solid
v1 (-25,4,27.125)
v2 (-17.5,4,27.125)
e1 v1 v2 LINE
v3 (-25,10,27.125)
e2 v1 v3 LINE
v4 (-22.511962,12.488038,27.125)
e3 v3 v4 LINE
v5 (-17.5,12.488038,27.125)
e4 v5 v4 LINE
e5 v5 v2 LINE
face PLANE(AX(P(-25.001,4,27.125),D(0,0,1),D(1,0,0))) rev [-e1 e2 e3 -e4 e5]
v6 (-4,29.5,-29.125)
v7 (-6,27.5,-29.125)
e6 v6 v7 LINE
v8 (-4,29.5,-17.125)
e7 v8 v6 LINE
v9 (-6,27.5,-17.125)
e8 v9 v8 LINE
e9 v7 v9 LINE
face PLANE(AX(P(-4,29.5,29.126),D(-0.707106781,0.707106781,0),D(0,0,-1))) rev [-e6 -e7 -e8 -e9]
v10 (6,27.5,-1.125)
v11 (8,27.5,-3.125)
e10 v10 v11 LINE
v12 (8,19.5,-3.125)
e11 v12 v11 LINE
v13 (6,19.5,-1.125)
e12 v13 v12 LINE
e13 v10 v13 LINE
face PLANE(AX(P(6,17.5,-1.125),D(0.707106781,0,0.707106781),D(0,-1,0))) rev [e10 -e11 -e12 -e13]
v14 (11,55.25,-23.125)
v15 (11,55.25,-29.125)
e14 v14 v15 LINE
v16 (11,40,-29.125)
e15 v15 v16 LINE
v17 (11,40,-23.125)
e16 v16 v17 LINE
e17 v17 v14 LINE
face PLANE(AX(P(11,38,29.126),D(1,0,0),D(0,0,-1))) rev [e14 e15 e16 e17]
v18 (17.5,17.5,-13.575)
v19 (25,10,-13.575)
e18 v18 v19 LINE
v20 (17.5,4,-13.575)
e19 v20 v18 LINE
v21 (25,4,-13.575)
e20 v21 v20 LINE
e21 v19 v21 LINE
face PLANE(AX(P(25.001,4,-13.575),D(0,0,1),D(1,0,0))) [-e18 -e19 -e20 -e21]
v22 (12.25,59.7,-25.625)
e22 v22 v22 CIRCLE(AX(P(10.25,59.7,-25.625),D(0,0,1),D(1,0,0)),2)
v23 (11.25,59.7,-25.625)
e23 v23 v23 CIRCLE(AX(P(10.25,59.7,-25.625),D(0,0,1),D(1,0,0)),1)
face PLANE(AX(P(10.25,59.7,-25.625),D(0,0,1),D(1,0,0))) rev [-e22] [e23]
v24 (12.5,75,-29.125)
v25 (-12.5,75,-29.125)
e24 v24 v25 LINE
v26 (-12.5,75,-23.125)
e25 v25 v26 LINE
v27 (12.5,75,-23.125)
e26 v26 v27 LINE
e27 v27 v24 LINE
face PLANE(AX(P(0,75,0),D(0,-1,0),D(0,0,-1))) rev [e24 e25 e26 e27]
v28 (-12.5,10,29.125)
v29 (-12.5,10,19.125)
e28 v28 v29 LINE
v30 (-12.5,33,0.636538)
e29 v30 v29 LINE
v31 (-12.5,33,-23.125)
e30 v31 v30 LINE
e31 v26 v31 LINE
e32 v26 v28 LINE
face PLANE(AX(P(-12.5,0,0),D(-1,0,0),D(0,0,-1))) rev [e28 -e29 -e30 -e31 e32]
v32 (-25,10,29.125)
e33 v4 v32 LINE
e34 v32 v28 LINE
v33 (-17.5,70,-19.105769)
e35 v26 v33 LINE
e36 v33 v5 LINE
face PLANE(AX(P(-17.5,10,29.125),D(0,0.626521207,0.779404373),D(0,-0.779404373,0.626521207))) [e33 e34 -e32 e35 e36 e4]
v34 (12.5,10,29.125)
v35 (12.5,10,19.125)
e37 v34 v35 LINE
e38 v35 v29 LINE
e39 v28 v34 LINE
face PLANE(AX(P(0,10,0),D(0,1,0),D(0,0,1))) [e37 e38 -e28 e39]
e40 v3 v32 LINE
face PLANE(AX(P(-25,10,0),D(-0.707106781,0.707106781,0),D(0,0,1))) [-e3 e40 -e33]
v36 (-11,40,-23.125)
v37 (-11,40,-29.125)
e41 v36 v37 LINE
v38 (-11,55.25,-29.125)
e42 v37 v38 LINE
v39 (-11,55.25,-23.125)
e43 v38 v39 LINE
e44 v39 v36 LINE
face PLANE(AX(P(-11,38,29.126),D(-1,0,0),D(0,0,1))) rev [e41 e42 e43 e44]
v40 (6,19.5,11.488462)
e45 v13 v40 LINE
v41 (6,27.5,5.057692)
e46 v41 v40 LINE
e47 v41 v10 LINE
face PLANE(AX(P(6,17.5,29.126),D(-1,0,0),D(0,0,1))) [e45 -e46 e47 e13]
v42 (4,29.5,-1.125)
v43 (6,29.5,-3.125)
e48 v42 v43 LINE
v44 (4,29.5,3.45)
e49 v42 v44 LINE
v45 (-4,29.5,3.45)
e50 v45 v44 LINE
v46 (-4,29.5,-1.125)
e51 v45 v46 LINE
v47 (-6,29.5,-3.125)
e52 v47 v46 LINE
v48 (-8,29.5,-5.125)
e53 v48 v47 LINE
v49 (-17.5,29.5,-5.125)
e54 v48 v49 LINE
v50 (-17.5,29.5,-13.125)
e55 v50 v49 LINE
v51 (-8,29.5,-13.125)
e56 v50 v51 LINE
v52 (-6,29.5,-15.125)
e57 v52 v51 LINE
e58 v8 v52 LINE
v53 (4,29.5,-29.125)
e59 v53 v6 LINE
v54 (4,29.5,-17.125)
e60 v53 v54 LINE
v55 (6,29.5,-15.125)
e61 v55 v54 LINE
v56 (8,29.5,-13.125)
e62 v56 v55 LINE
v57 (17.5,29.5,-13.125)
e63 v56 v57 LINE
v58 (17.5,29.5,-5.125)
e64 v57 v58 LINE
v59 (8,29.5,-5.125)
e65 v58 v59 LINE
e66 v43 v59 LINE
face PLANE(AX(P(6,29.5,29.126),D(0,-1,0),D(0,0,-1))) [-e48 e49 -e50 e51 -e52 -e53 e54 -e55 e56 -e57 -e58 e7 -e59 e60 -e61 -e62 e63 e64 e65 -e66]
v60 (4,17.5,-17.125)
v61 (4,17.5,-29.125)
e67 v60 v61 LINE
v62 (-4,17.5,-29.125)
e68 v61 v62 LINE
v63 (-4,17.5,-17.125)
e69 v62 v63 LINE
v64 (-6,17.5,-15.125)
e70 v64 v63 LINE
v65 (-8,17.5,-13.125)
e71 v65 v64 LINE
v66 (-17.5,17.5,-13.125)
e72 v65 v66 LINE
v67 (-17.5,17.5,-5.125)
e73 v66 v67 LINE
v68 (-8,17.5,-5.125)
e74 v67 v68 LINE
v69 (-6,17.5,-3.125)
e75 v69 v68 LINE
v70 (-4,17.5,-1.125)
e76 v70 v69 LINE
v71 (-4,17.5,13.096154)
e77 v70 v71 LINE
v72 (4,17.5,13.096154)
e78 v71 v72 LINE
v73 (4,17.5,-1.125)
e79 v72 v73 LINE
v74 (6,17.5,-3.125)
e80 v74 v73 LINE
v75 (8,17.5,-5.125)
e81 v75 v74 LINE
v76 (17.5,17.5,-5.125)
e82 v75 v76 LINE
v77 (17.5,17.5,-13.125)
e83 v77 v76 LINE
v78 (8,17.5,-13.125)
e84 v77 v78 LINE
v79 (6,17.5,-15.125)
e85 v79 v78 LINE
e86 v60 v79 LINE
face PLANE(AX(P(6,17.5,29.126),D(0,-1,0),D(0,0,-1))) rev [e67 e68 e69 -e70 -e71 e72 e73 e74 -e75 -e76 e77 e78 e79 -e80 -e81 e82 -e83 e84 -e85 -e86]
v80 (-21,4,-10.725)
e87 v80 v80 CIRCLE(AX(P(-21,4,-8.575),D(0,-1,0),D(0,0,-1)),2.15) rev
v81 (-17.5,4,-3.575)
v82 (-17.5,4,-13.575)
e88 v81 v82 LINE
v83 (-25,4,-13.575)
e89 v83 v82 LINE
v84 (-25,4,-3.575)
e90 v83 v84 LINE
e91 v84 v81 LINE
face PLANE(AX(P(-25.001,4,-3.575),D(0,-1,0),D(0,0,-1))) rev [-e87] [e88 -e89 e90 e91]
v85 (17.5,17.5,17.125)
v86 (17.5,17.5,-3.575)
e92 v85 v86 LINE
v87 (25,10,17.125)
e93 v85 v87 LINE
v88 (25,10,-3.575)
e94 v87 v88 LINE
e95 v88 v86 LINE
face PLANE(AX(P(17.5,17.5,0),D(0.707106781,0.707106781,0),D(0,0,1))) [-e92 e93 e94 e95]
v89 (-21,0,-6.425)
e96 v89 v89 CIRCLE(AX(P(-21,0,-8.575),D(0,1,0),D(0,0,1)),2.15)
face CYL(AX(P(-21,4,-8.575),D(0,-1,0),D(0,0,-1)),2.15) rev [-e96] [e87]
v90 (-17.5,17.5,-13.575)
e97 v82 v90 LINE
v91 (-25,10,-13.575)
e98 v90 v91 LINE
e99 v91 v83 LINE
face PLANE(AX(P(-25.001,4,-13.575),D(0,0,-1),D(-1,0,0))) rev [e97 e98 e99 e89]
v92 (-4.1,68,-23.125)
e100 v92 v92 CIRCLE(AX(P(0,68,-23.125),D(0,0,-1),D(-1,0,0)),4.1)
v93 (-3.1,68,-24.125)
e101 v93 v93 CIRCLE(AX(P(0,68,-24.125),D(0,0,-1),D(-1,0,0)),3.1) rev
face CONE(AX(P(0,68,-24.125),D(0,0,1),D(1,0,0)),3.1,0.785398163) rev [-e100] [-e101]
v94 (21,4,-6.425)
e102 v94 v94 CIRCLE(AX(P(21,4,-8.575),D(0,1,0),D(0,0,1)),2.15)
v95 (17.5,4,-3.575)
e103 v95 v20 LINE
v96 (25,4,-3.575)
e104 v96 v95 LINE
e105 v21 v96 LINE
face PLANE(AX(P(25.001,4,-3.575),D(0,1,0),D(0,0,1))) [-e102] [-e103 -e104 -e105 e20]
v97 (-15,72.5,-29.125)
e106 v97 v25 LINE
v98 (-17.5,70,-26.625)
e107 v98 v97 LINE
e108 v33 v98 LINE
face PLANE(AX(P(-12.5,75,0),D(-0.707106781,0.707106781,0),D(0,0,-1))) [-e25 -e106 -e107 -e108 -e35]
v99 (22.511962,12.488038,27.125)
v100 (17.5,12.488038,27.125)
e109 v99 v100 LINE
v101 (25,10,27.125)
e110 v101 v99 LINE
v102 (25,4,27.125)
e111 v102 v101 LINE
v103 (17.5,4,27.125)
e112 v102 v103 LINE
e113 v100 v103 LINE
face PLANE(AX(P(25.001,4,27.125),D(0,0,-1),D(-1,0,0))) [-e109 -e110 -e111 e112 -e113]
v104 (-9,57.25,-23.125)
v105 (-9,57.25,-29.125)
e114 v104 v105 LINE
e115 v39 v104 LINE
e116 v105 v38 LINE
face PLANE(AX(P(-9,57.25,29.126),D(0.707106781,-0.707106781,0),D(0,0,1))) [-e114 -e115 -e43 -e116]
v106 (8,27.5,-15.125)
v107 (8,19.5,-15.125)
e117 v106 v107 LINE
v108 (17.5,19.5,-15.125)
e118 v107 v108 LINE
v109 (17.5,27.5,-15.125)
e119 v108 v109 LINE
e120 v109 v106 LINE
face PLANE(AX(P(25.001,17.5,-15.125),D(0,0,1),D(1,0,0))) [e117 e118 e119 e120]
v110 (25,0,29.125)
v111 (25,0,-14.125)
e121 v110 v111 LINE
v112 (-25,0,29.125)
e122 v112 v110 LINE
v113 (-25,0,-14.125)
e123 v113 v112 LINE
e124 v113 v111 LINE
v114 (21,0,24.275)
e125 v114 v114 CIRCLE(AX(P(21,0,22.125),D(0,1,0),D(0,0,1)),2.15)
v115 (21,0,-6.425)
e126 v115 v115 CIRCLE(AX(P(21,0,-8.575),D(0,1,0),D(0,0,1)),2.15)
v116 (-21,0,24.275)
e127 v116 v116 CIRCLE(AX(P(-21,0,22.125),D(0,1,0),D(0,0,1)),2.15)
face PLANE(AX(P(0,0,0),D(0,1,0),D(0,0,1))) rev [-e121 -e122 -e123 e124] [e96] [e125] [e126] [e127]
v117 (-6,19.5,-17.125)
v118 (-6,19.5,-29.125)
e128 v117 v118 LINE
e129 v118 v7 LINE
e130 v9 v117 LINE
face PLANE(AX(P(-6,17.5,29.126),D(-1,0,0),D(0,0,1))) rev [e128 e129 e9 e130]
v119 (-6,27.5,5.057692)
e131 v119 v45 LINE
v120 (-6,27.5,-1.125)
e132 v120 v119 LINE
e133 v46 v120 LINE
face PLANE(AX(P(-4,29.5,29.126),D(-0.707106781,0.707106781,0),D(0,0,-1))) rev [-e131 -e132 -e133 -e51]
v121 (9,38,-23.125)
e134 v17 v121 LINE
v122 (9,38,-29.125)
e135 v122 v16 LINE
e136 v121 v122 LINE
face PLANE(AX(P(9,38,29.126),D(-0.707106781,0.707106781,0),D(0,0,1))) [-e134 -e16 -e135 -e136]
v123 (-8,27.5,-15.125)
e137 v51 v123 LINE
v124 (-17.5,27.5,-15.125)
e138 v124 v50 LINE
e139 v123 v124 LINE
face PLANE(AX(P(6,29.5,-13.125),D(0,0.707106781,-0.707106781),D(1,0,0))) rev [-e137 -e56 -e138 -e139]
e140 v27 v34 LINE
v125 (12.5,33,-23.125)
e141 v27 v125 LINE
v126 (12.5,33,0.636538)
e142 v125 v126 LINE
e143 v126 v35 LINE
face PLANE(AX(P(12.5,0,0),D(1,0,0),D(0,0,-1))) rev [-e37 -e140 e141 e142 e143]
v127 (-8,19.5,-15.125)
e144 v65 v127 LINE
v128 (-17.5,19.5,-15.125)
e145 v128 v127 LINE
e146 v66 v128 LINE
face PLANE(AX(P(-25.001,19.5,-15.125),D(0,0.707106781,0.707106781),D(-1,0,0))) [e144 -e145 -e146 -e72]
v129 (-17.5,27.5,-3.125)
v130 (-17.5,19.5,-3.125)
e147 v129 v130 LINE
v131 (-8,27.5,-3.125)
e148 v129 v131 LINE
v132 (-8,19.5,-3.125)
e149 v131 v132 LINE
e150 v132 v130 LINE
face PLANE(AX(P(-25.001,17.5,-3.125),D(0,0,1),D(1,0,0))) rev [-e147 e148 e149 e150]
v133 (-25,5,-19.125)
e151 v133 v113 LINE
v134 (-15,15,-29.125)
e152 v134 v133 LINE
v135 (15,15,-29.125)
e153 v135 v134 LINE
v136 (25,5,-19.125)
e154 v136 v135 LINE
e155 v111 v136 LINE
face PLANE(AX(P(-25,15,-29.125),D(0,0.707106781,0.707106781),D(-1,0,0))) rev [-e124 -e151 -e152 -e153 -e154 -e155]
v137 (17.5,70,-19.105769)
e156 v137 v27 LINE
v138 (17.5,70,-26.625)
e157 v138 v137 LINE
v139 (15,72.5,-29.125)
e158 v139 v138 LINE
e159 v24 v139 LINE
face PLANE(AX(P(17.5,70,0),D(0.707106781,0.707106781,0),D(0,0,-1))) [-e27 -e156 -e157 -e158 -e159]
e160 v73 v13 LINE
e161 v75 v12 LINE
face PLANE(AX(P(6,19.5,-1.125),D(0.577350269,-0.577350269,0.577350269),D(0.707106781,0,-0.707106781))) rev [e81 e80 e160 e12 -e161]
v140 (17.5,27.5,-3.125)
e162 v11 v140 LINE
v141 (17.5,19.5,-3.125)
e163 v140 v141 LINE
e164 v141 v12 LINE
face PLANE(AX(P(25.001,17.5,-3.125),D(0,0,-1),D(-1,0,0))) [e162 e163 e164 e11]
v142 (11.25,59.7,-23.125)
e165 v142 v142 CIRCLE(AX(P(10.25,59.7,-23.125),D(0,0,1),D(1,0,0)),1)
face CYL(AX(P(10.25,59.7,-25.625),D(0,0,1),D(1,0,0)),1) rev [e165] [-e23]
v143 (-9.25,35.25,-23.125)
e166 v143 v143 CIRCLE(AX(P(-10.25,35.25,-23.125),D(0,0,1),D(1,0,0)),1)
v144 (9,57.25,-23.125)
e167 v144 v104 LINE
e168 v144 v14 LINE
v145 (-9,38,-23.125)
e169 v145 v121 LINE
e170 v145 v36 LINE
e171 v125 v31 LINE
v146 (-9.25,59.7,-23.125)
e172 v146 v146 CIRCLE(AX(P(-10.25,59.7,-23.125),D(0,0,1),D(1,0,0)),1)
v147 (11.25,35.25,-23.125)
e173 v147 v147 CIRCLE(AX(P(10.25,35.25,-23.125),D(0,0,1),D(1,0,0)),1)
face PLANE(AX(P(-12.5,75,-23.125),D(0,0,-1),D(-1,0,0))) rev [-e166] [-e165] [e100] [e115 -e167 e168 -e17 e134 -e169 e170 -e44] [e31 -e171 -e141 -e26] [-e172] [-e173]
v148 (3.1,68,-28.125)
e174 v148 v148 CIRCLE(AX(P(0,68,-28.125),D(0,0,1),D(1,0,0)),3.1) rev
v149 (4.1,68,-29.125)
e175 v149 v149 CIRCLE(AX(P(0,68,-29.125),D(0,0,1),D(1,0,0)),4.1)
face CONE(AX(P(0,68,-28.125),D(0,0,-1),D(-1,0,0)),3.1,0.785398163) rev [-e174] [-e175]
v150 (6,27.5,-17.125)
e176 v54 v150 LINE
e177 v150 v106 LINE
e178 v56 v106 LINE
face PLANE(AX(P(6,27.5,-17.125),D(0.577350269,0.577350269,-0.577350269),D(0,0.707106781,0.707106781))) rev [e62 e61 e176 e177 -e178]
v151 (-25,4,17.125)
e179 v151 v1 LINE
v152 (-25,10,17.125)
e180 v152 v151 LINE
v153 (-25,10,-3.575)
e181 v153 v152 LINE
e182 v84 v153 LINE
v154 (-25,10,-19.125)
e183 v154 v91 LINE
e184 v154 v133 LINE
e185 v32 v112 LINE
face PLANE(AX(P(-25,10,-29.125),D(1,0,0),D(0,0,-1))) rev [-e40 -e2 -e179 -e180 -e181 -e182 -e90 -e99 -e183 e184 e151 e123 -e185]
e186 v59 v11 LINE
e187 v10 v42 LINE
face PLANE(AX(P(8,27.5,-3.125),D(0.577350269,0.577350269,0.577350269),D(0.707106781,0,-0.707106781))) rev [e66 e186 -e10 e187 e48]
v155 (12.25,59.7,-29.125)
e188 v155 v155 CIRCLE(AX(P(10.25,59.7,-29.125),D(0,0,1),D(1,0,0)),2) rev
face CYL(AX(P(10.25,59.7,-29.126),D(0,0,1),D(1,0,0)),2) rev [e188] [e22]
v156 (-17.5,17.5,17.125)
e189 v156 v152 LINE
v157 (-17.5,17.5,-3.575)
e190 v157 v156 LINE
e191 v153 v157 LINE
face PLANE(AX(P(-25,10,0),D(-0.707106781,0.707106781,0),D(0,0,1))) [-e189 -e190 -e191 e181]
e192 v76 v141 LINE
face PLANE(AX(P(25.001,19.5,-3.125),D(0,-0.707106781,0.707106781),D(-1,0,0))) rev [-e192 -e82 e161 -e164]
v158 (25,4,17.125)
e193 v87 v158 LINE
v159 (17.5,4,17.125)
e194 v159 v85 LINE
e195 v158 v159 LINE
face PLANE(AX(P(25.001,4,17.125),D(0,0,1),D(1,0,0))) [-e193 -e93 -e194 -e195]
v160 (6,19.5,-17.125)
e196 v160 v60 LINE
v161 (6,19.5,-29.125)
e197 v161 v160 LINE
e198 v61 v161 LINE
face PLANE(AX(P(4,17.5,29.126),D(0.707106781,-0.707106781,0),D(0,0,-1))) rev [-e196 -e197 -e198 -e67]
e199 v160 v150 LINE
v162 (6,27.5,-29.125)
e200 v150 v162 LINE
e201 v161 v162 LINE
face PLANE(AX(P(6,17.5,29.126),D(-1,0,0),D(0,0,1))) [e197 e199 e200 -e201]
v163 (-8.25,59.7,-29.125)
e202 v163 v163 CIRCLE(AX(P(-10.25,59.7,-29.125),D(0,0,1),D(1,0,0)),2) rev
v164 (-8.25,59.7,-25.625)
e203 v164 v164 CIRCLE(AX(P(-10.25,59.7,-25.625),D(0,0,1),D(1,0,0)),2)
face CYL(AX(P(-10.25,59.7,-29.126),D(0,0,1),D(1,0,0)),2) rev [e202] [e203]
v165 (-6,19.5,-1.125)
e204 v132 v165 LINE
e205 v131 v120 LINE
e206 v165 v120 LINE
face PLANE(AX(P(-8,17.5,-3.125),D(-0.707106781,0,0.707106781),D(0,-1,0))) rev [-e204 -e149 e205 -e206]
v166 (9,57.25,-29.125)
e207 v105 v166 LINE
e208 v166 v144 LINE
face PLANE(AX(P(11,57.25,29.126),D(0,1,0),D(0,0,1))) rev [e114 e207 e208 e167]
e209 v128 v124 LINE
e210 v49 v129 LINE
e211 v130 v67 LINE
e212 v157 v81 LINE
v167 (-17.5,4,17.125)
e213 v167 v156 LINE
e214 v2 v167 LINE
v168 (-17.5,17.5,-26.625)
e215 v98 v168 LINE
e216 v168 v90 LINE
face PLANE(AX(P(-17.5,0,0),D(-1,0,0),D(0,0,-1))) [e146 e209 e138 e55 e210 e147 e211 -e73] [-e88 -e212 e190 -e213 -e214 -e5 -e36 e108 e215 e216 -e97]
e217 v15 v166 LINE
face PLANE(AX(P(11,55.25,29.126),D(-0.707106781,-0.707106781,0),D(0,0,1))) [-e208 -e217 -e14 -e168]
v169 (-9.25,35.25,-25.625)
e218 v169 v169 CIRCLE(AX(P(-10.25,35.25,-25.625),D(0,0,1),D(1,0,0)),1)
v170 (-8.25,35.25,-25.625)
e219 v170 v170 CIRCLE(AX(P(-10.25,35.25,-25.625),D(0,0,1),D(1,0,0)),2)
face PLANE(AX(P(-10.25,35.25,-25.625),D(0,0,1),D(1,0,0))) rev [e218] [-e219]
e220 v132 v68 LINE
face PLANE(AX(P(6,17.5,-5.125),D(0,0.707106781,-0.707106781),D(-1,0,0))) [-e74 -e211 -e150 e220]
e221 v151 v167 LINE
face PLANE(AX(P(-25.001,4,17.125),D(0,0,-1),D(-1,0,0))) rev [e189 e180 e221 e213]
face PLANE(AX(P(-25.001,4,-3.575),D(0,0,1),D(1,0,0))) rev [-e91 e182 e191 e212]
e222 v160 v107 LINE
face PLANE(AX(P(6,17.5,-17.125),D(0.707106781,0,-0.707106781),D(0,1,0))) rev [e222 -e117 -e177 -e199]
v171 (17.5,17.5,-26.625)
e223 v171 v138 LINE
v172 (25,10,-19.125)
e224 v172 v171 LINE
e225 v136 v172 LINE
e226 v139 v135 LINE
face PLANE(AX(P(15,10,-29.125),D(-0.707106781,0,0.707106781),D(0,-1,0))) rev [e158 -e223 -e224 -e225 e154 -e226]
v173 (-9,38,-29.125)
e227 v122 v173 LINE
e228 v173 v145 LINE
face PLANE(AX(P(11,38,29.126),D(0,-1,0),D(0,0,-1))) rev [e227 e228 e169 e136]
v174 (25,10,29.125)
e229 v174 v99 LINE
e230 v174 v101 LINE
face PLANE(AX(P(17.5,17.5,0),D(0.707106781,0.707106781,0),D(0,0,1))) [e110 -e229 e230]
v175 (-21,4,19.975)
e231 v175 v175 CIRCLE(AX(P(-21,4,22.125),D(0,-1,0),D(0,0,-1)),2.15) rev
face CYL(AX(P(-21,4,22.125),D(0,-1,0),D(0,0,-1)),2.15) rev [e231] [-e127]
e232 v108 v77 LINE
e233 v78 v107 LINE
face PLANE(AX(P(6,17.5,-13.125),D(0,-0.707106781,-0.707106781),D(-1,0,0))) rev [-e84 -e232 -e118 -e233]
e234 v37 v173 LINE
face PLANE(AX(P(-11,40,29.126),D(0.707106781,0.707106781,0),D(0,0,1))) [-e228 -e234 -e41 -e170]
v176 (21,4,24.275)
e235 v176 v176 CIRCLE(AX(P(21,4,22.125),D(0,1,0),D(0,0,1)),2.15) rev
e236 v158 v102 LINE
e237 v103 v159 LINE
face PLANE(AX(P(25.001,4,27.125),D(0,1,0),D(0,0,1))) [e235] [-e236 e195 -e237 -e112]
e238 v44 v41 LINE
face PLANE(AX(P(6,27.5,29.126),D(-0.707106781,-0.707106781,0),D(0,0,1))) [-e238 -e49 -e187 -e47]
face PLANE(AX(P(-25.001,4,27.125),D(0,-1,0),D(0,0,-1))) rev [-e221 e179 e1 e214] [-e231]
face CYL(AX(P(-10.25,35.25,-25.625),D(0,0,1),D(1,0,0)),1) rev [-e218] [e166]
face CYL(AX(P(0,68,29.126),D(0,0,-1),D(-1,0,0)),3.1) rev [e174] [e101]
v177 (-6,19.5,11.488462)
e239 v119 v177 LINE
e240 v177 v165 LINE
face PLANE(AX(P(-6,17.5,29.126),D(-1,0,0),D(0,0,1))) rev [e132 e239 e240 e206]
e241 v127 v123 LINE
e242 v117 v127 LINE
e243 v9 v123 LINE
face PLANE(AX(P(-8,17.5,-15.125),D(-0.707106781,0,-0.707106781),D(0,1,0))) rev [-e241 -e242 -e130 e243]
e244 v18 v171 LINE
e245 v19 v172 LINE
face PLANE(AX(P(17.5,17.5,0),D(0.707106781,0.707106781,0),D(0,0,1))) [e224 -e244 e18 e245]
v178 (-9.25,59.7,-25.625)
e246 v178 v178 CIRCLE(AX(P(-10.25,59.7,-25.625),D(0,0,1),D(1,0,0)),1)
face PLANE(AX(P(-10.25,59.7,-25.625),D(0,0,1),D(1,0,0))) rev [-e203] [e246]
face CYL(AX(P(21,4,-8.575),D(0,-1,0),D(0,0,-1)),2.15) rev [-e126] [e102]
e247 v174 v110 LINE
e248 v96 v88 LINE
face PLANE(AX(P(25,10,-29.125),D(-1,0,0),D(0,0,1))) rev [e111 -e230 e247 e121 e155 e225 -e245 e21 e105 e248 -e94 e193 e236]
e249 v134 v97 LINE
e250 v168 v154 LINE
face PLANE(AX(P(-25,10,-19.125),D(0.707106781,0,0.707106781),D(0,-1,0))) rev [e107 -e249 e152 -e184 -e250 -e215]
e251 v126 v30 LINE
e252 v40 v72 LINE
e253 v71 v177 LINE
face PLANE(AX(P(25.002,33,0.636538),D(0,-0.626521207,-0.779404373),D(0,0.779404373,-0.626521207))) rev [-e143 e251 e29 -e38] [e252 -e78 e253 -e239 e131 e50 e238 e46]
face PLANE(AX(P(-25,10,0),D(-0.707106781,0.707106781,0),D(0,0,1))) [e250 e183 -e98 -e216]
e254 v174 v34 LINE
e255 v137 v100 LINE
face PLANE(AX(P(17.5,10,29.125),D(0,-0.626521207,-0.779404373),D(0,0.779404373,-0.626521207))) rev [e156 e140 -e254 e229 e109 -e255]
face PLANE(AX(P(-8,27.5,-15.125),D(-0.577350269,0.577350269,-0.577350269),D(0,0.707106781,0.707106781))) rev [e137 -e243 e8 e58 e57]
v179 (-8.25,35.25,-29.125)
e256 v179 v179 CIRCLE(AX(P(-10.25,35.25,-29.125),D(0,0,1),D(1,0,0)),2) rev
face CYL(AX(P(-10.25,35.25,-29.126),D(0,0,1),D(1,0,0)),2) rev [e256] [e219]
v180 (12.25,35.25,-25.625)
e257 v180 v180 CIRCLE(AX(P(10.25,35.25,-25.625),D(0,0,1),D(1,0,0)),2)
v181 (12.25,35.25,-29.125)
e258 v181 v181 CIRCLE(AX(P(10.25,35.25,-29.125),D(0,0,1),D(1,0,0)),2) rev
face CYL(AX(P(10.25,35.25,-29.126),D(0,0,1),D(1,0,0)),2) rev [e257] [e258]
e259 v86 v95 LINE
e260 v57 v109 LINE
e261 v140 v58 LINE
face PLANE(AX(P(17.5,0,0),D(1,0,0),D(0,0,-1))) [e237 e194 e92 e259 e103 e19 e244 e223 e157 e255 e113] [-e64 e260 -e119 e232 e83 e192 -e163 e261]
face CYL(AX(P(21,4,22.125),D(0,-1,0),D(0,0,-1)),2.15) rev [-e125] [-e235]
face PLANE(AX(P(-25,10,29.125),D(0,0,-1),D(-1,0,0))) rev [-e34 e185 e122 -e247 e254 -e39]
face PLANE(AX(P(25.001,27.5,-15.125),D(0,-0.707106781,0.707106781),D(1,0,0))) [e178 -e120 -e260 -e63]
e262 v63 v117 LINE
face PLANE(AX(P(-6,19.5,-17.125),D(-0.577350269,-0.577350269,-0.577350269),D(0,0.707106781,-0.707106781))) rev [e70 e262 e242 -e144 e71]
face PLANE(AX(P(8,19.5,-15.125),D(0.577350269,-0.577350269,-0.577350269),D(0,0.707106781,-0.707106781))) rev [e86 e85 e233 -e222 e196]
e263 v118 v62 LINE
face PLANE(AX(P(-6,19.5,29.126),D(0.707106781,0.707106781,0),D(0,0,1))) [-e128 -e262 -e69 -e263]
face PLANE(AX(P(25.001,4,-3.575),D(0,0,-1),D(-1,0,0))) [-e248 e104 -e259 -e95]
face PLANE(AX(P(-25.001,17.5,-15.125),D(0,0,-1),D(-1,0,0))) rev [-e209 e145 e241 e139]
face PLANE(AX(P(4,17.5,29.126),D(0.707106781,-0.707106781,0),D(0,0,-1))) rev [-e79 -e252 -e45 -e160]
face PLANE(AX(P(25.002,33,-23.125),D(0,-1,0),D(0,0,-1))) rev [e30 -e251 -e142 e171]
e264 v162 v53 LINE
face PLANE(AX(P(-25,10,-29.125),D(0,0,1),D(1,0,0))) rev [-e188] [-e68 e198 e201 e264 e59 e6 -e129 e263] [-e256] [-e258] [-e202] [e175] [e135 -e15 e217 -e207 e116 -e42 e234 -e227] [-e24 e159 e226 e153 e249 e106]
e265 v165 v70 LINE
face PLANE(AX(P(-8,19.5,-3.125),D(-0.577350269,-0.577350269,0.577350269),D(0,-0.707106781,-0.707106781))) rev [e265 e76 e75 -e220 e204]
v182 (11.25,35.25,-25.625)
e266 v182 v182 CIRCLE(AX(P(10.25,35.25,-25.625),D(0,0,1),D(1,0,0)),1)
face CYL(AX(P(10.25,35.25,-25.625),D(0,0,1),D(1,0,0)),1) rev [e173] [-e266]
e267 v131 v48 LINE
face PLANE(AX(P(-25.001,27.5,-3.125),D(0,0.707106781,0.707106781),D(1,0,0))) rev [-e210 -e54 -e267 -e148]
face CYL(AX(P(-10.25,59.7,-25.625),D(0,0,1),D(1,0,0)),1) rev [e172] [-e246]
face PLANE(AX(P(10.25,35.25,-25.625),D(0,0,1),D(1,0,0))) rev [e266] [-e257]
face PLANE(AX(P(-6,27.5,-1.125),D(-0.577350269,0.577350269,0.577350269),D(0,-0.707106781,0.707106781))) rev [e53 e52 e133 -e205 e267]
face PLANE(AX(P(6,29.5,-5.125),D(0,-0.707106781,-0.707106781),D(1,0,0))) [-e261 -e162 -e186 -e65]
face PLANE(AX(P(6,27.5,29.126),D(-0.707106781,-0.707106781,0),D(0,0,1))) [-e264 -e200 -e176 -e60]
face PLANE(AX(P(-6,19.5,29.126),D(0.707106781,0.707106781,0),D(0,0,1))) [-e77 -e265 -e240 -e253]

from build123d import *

# Parameters (mm, degrees)
SKETCH1_W               = 50
SKETCH1_H               = 58.25
BOSS_EXTRUDE1_DEPTH     = 10
SKETCH2_R               = 2.15
CUT_EXTRUDE1_DEPTH      = 4
SKETCH5_W               = 25
SKETCH5_H               = 6
BOSS_EXTRUDE3_DEPTH     = 65
CUT_EXTRUDE3_REACH      = 100.199
SKETCH6_W               = 22
SKETCH6_H               = 19.25
SKETCH7_R               = 1
CUT_EXTRUDE4_DEPTH      = 2.5
CUT_EXTRUDE5_REACH      = 98.164
SKETCH8_R               = 2
BOSS_EXTRUDE4_DEPTH     = 5
CHAMFER1_SIZE           = 7.5
CHAMFER2_SIZE           = 10
CHAMFER4_SIZE           = 15
CHAMFER5_SIZE           = 5
CHAMFER7_SIZE           = 2
CUT_EXTRUDE6_REACH      = 100.199
SKETCH10_R              = 3.1
CHAMFER8_SIZE           = 1
BOSS_EXTRUDE5_REACH     = 90.767
CUT_EXTRUDE7_REACH      = 100.199
SKETCH12_W              = 12
SKETCH12_H              = 12
CUT_EXTRUDE9_REACH      = 88.222
SKETCH14_W              = 12
SKETCH14_H              = 12
CHAMFER11_SIZE          = 2
CUT_EXTRUDE12_OUTLINE_W = 10
CUT_EXTRUDE12_OUTLINE_H = 13.5
CUT_EXTRUDE12_DEPTH     = 7.5
LPATTERN1_COUNT         = 2
LPATTERN1_PITCH         = 30.7
MIRROR3_COPY_1_SKETCH_W = 10
MIRROR3_COPY_1_SKETCH_H = 13.5
MIRROR3_COPY_1_DEPTH    = 7.5


# Read off the part's stored shape, not the designer's step: Cut-Extrude12
with BuildPart() as part:
    # Sketch1 → Boss-Extrude1 (new body)
    with BuildSketch(Plane(origin=(0, 0, 0), x_dir=(1, 0, 0), z_dir=(0, 1, 0))):
        Rectangle(SKETCH1_W, SKETCH1_H)
    extrude(amount=BOSS_EXTRUDE1_DEPTH)

    # Sketch2 → Cut-Extrude1 (cut)
    with BuildSketch(Plane(origin=(0, 0, 0), x_dir=(1, 0, 0), z_dir=(0, 1, 0))):
        with Locations(Location((-21, 8.575, 0), (0, 0, 270))):
            Circle(SKETCH2_R)
        with Locations(Location((-21, -22.125, 0), (0, 0, 270))):
            Circle(SKETCH2_R)
        with Locations(Location((21, 8.575, 0), (0, 0, 270))):
            Circle(SKETCH2_R)
        with Locations(Location((21, -22.125, 0), (0, 0, 270))):
            Circle(SKETCH2_R)
    extrude(amount=CUT_EXTRUDE1_DEPTH, mode=Mode.SUBTRACT)

    # Sketch5 → Boss-Extrude3 (add)
    with BuildSketch(Plane(origin=(0, 10, 0), x_dir=(1, 0, 0), z_dir=(0, 1, 0))):
        with Locations((0, 26.125)):
            Rectangle(SKETCH5_W, SKETCH5_H)
    extrude(amount=BOSS_EXTRUDE3_DEPTH)

    # Sketch6 → Cut-Extrude3 (cut, up to next)
    with BuildSketch(Plane(origin=(0, 0, -29.125), x_dir=(-1, 0, 0), z_dir=(0, 0, -1)), mode=Mode.PRIVATE) as cut_extrude3_sk1:
        with Locations((0, 47.625)):
            Rectangle(SKETCH6_W, SKETCH6_H)
    cut_extrude3_tool1 = extrude(cut_extrude3_sk1.sketch, amount=-CUT_EXTRUDE3_REACH, mode=Mode.PRIVATE) & part.part
    add(cut_extrude3_tool1.solids().sort_by_distance((0, 47.625, -29.125))[0], mode=Mode.SUBTRACT)

    # Sketch7 → Cut-Extrude4 (cut)
    with BuildSketch(Plane.XY.offset(-23.125)):
        with Locations((10.25, 35.25)):
            Circle(SKETCH7_R)
        with Locations((-10.25, 35.25)):
            Circle(SKETCH7_R)
        with Locations((-10.25, 59.7)):
            Circle(SKETCH7_R)
        with Locations((10.25, 59.7)):
            Circle(SKETCH7_R)
    extrude(amount=-CUT_EXTRUDE4_DEPTH, mode=Mode.SUBTRACT)

    # Sketch8 → Cut-Extrude5 (cut, up to next)
    with BuildSketch(Plane.XY.offset(-25.625), mode=Mode.PRIVATE) as cut_extrude5_sk1:
        with Locations((-10.25, 59.7)):
            Circle(SKETCH8_R)
    cut_extrude5_tool1 = extrude(cut_extrude5_sk1.sketch, amount=-CUT_EXTRUDE5_REACH, mode=Mode.PRIVATE) & part.part
    # Sketch8 → Cut-Extrude5 (cut, up to next)
    with BuildSketch(Plane.XY.offset(-25.625), mode=Mode.PRIVATE) as cut_extrude5_sk2:
        with Locations((10.25, 59.7)):
            Circle(SKETCH8_R)
    cut_extrude5_tool2 = extrude(cut_extrude5_sk2.sketch, amount=-CUT_EXTRUDE5_REACH, mode=Mode.PRIVATE) & part.part
    # Sketch8 → Cut-Extrude5 (cut, up to next)
    with BuildSketch(Plane.XY.offset(-25.625), mode=Mode.PRIVATE) as cut_extrude5_sk3:
        with Locations((10.25, 35.25)):
            Circle(SKETCH8_R)
    cut_extrude5_tool3 = extrude(cut_extrude5_sk3.sketch, amount=-CUT_EXTRUDE5_REACH, mode=Mode.PRIVATE) & part.part
    # Sketch8 → Cut-Extrude5 (cut, up to next)
    with BuildSketch(Plane.XY.offset(-25.625), mode=Mode.PRIVATE) as cut_extrude5_sk4:
        with Locations((-10.25, 35.25)):
            Circle(SKETCH8_R)
    cut_extrude5_tool4 = extrude(cut_extrude5_sk4.sketch, amount=-CUT_EXTRUDE5_REACH, mode=Mode.PRIVATE) & part.part
    add(cut_extrude5_tool1.solids().sort_by_distance((-10.25, 59.7, -25.625))[0], mode=Mode.SUBTRACT)
    add(cut_extrude5_tool2.solids().sort_by_distance((10.25, 59.7, -25.625))[0], mode=Mode.SUBTRACT)
    add(cut_extrude5_tool3.solids().sort_by_distance((10.25, 35.25, -25.625))[0], mode=Mode.SUBTRACT)
    add(cut_extrude5_tool4.solids().sort_by_distance((-10.25, 35.25, -25.625))[0], mode=Mode.SUBTRACT)

    # Sketch9 → Boss-Extrude4 (add)
    with BuildSketch(Plane(origin=(12.5, 0, 0), x_dir=(0, 0, -1), z_dir=(1, 0, 0))):
        Polygon((29.125, 75), (23.125, 75), (-29.125, 10), (29.125, 10), align=None)
    boss_extrude4 = extrude(amount=BOSS_EXTRUDE4_DEPTH)

    # Mirror1: Boss-Extrude4 across plane
    add(boss_extrude4.mirror(Plane(origin=(0, 0, 0), x_dir=(0, 0, 1), z_dir=(1, 0, 0))))

    # Chamfer1
    chamfer1_edges = [part.edges().sort_by_distance(p)[0] for p in [
        (17.5, 10, 0),
        (-17.5, 10, 0),
    ]]
    chamfer(chamfer1_edges, length=CHAMFER1_SIZE - 0.0001)  # a hair under: the kernel refuses the full size

    # Chamfer2
    chamfer2_edges = [part.edges().sort_by_distance(p)[0] for p in [
        (-25, 5, -29.125),
        (25, 5, -29.125),
    ]]
    chamfer(chamfer2_edges, length=CHAMFER2_SIZE)

    # Chamfer4
    chamfer4_edges = [part.edges().sort_by_distance(p)[0] for p in [
        (0, 0, -29.125),
    ]]
    chamfer(chamfer4_edges, length=CHAMFER4_SIZE)

    # Chamfer5
    chamfer5_edges = [part.edges().sort_by_distance(p)[0] for p in [
        (17.5, 75, -24.875),
        (-17.5, 75, -24.875),
    ]]
    chamfer(chamfer5_edges, length=CHAMFER5_SIZE)

    # Chamfer7
    chamfer7_edges = [part.edges().sort_by_distance(p)[0] for p in [
        (-11, 57.25, -26.125),
        (-11, 38, -26.125),
        (11, 38, -26.125),
        (11, 57.25, -26.125),
    ]]
    chamfer(chamfer7_edges, length=CHAMFER7_SIZE)

    # Sketch10 → Cut-Extrude6 (cut, up to next)
    with BuildSketch(Plane(origin=(0, 0, -29.125), x_dir=(-1, 0, 0), z_dir=(0, 0, -1)), mode=Mode.PRIVATE) as cut_extrude6_sk1:
        with Locations((0, 68)):
            Circle(SKETCH10_R)
    cut_extrude6_tool1 = extrude(cut_extrude6_sk1.sketch, amount=-CUT_EXTRUDE6_REACH, mode=Mode.PRIVATE) & part.part
    add(cut_extrude6_tool1.solids().sort_by_distance((0, 68, -29.125))[0], mode=Mode.SUBTRACT)

    # Chamfer8
    chamfer8_edges = [part.edges().sort_by_distance(p)[0] for p in [
        (3.1, 68, -29.125),
        (3.1, 68, -23.125),
    ]]
    chamfer(chamfer8_edges, length=CHAMFER8_SIZE)

    # Sketch11 → Boss-Extrude5 (add, up to next)
    with BuildSketch(Plane(origin=(-12.5, 0, 0), x_dir=(0, 0, -1), z_dir=(1, 0, 0)), mode=Mode.PRIVATE) as boss_extrude5_sk1:
        Polygon((-19.125, 10), (23.125, 10), (23.125, 33), (-0.636538462, 33), align=None)
    boss_extrude5_tool1 = extrude(boss_extrude5_sk1.sketch, amount=BOSS_EXTRUDE5_REACH, mode=Mode.PRIVATE) - part.part
    add(boss_extrude5_tool1.solids().sort_by_distance((-12.5, 20.426363, -6.190596))[0])

    # Cut-Extrude7: up to this plane
    cut_extrude7_end = Plane(origin=(25.002, 33, 0.636538462), z_dir=(0, -0.6265212074854106, -0.7794043729483581))
    # Sketch12 → Cut-Extrude7 (cut, up to the surface)
    with BuildSketch(Plane(origin=(0, 0, -29.125), x_dir=(-1, 0, 0), z_dir=(0, 0, -1)), mode=Mode.PRIVATE) as cut_extrude7_sk1:
        with Locations((0, 23.5)):
            Rectangle(SKETCH12_W, SKETCH12_H)
    cut_extrude7_tool1 = split(extrude(cut_extrude7_sk1.sketch, amount=-CUT_EXTRUDE7_REACH, mode=Mode.PRIVATE), bisect_by=cut_extrude7_end, keep=Keep.BOTH, mode=Mode.PRIVATE)
    add(cut_extrude7_tool1.solids().sort_by_distance((0, 23.5, -29.125))[0], mode=Mode.SUBTRACT)

    # Sketch14 → Cut-Extrude9 (cut, up to next)
    with BuildSketch(Plane(origin=(-6, 0, 0), x_dir=(0, 0, -1), z_dir=(1, 0, 0)), mode=Mode.PRIVATE) as cut_extrude9_sk1:
        with Locations((9.125, 23.5)):
            Rectangle(SKETCH14_W, SKETCH14_H)
    cut_extrude9_tool1 = extrude(cut_extrude9_sk1.sketch, amount=-CUT_EXTRUDE9_REACH, mode=Mode.PRIVATE) & part.part
    cut_extrude9 = cut_extrude9_tool1.solids().sort_by_distance((-6, 23.5, -9.125))[0]
    add(cut_extrude9, mode=Mode.SUBTRACT)

    # Mirror2: Cut-Extrude9 across plane
    add(cut_extrude9.mirror(Plane(origin=(0, 0, 0), x_dir=(0, 0, 1), z_dir=(1, 0, 0))), mode=Mode.SUBTRACT)

    # Chamfer11
    chamfer11_edges = [part.edges().sort_by_distance(p)[0] for p in [
        (-6, 17.5, 4.985576923),
        (6, 17.5, 4.985576923),
        (6, 29.5, 0.1625),
        (-6, 29.5, 0.1625),
        (-6, 17.5, -22.125),
        (-6, 29.5, -22.125),
        (-11.75, 17.5, -15.125),
        (-11.75, 29.5, -15.125),
        (-11.75, 17.5, -3.125),
        (-11.75, 29.5, -3.125),
        (-6, 23.5, -15.125),
        (-6, 23.5, -3.125),
        (6, 29.5, -22.125),
        (6, 17.5, -22.125),
        (11.75, 17.5, -3.125),
        (11.75, 17.5, -15.125),
        (6, 23.5, -15.125),
        (11.75, 29.5, -15.125),
        (11.75, 29.5, -3.125),
        (6, 23.5, -3.125),
    ]]
    chamfer(chamfer11_edges, length=CHAMFER11_SIZE)

    # Cut-Extrude12 outline → Cut-Extrude12 (cut)
    with BuildSketch(Plane(origin=(17.5, 0, 0), x_dir=(0, 0, -1), z_dir=(1, 0, 0))):
        with Locations((8.575, 10.75)):
            Rectangle(CUT_EXTRUDE12_OUTLINE_W, CUT_EXTRUDE12_OUTLINE_H)
    cut_extrude12 = extrude(amount=CUT_EXTRUDE12_DEPTH, mode=Mode.SUBTRACT)

    # LPattern1: Cut-Extrude12 ×2
    with Locations(*[(0, 0, i * LPATTERN1_PITCH) for i in range(1, LPATTERN1_COUNT)]):
        add(cut_extrude12, mode=Mode.SUBTRACT)

    # Mirror3: Cut-Extrude12 across plane
    add(cut_extrude12.mirror(Plane(origin=(0, 0, 0), x_dir=(0, 0, 1), z_dir=(1, 0, 0))), mode=Mode.SUBTRACT)

    # Mirror3 copy 1 sketch → Mirror3 copy 1 (cut)
    with BuildSketch(Plane(origin=(-17.5, 0, 30.7), x_dir=(0, 0, -1), z_dir=(-1, 0, 0))):
        with Locations((8.575, -10.75)):
            Rectangle(MIRROR3_COPY_1_SKETCH_W, MIRROR3_COPY_1_SKETCH_H)
    extrude(amount=MIRROR3_COPY_1_DEPTH, mode=Mode.SUBTRACT)


solid = part.part
